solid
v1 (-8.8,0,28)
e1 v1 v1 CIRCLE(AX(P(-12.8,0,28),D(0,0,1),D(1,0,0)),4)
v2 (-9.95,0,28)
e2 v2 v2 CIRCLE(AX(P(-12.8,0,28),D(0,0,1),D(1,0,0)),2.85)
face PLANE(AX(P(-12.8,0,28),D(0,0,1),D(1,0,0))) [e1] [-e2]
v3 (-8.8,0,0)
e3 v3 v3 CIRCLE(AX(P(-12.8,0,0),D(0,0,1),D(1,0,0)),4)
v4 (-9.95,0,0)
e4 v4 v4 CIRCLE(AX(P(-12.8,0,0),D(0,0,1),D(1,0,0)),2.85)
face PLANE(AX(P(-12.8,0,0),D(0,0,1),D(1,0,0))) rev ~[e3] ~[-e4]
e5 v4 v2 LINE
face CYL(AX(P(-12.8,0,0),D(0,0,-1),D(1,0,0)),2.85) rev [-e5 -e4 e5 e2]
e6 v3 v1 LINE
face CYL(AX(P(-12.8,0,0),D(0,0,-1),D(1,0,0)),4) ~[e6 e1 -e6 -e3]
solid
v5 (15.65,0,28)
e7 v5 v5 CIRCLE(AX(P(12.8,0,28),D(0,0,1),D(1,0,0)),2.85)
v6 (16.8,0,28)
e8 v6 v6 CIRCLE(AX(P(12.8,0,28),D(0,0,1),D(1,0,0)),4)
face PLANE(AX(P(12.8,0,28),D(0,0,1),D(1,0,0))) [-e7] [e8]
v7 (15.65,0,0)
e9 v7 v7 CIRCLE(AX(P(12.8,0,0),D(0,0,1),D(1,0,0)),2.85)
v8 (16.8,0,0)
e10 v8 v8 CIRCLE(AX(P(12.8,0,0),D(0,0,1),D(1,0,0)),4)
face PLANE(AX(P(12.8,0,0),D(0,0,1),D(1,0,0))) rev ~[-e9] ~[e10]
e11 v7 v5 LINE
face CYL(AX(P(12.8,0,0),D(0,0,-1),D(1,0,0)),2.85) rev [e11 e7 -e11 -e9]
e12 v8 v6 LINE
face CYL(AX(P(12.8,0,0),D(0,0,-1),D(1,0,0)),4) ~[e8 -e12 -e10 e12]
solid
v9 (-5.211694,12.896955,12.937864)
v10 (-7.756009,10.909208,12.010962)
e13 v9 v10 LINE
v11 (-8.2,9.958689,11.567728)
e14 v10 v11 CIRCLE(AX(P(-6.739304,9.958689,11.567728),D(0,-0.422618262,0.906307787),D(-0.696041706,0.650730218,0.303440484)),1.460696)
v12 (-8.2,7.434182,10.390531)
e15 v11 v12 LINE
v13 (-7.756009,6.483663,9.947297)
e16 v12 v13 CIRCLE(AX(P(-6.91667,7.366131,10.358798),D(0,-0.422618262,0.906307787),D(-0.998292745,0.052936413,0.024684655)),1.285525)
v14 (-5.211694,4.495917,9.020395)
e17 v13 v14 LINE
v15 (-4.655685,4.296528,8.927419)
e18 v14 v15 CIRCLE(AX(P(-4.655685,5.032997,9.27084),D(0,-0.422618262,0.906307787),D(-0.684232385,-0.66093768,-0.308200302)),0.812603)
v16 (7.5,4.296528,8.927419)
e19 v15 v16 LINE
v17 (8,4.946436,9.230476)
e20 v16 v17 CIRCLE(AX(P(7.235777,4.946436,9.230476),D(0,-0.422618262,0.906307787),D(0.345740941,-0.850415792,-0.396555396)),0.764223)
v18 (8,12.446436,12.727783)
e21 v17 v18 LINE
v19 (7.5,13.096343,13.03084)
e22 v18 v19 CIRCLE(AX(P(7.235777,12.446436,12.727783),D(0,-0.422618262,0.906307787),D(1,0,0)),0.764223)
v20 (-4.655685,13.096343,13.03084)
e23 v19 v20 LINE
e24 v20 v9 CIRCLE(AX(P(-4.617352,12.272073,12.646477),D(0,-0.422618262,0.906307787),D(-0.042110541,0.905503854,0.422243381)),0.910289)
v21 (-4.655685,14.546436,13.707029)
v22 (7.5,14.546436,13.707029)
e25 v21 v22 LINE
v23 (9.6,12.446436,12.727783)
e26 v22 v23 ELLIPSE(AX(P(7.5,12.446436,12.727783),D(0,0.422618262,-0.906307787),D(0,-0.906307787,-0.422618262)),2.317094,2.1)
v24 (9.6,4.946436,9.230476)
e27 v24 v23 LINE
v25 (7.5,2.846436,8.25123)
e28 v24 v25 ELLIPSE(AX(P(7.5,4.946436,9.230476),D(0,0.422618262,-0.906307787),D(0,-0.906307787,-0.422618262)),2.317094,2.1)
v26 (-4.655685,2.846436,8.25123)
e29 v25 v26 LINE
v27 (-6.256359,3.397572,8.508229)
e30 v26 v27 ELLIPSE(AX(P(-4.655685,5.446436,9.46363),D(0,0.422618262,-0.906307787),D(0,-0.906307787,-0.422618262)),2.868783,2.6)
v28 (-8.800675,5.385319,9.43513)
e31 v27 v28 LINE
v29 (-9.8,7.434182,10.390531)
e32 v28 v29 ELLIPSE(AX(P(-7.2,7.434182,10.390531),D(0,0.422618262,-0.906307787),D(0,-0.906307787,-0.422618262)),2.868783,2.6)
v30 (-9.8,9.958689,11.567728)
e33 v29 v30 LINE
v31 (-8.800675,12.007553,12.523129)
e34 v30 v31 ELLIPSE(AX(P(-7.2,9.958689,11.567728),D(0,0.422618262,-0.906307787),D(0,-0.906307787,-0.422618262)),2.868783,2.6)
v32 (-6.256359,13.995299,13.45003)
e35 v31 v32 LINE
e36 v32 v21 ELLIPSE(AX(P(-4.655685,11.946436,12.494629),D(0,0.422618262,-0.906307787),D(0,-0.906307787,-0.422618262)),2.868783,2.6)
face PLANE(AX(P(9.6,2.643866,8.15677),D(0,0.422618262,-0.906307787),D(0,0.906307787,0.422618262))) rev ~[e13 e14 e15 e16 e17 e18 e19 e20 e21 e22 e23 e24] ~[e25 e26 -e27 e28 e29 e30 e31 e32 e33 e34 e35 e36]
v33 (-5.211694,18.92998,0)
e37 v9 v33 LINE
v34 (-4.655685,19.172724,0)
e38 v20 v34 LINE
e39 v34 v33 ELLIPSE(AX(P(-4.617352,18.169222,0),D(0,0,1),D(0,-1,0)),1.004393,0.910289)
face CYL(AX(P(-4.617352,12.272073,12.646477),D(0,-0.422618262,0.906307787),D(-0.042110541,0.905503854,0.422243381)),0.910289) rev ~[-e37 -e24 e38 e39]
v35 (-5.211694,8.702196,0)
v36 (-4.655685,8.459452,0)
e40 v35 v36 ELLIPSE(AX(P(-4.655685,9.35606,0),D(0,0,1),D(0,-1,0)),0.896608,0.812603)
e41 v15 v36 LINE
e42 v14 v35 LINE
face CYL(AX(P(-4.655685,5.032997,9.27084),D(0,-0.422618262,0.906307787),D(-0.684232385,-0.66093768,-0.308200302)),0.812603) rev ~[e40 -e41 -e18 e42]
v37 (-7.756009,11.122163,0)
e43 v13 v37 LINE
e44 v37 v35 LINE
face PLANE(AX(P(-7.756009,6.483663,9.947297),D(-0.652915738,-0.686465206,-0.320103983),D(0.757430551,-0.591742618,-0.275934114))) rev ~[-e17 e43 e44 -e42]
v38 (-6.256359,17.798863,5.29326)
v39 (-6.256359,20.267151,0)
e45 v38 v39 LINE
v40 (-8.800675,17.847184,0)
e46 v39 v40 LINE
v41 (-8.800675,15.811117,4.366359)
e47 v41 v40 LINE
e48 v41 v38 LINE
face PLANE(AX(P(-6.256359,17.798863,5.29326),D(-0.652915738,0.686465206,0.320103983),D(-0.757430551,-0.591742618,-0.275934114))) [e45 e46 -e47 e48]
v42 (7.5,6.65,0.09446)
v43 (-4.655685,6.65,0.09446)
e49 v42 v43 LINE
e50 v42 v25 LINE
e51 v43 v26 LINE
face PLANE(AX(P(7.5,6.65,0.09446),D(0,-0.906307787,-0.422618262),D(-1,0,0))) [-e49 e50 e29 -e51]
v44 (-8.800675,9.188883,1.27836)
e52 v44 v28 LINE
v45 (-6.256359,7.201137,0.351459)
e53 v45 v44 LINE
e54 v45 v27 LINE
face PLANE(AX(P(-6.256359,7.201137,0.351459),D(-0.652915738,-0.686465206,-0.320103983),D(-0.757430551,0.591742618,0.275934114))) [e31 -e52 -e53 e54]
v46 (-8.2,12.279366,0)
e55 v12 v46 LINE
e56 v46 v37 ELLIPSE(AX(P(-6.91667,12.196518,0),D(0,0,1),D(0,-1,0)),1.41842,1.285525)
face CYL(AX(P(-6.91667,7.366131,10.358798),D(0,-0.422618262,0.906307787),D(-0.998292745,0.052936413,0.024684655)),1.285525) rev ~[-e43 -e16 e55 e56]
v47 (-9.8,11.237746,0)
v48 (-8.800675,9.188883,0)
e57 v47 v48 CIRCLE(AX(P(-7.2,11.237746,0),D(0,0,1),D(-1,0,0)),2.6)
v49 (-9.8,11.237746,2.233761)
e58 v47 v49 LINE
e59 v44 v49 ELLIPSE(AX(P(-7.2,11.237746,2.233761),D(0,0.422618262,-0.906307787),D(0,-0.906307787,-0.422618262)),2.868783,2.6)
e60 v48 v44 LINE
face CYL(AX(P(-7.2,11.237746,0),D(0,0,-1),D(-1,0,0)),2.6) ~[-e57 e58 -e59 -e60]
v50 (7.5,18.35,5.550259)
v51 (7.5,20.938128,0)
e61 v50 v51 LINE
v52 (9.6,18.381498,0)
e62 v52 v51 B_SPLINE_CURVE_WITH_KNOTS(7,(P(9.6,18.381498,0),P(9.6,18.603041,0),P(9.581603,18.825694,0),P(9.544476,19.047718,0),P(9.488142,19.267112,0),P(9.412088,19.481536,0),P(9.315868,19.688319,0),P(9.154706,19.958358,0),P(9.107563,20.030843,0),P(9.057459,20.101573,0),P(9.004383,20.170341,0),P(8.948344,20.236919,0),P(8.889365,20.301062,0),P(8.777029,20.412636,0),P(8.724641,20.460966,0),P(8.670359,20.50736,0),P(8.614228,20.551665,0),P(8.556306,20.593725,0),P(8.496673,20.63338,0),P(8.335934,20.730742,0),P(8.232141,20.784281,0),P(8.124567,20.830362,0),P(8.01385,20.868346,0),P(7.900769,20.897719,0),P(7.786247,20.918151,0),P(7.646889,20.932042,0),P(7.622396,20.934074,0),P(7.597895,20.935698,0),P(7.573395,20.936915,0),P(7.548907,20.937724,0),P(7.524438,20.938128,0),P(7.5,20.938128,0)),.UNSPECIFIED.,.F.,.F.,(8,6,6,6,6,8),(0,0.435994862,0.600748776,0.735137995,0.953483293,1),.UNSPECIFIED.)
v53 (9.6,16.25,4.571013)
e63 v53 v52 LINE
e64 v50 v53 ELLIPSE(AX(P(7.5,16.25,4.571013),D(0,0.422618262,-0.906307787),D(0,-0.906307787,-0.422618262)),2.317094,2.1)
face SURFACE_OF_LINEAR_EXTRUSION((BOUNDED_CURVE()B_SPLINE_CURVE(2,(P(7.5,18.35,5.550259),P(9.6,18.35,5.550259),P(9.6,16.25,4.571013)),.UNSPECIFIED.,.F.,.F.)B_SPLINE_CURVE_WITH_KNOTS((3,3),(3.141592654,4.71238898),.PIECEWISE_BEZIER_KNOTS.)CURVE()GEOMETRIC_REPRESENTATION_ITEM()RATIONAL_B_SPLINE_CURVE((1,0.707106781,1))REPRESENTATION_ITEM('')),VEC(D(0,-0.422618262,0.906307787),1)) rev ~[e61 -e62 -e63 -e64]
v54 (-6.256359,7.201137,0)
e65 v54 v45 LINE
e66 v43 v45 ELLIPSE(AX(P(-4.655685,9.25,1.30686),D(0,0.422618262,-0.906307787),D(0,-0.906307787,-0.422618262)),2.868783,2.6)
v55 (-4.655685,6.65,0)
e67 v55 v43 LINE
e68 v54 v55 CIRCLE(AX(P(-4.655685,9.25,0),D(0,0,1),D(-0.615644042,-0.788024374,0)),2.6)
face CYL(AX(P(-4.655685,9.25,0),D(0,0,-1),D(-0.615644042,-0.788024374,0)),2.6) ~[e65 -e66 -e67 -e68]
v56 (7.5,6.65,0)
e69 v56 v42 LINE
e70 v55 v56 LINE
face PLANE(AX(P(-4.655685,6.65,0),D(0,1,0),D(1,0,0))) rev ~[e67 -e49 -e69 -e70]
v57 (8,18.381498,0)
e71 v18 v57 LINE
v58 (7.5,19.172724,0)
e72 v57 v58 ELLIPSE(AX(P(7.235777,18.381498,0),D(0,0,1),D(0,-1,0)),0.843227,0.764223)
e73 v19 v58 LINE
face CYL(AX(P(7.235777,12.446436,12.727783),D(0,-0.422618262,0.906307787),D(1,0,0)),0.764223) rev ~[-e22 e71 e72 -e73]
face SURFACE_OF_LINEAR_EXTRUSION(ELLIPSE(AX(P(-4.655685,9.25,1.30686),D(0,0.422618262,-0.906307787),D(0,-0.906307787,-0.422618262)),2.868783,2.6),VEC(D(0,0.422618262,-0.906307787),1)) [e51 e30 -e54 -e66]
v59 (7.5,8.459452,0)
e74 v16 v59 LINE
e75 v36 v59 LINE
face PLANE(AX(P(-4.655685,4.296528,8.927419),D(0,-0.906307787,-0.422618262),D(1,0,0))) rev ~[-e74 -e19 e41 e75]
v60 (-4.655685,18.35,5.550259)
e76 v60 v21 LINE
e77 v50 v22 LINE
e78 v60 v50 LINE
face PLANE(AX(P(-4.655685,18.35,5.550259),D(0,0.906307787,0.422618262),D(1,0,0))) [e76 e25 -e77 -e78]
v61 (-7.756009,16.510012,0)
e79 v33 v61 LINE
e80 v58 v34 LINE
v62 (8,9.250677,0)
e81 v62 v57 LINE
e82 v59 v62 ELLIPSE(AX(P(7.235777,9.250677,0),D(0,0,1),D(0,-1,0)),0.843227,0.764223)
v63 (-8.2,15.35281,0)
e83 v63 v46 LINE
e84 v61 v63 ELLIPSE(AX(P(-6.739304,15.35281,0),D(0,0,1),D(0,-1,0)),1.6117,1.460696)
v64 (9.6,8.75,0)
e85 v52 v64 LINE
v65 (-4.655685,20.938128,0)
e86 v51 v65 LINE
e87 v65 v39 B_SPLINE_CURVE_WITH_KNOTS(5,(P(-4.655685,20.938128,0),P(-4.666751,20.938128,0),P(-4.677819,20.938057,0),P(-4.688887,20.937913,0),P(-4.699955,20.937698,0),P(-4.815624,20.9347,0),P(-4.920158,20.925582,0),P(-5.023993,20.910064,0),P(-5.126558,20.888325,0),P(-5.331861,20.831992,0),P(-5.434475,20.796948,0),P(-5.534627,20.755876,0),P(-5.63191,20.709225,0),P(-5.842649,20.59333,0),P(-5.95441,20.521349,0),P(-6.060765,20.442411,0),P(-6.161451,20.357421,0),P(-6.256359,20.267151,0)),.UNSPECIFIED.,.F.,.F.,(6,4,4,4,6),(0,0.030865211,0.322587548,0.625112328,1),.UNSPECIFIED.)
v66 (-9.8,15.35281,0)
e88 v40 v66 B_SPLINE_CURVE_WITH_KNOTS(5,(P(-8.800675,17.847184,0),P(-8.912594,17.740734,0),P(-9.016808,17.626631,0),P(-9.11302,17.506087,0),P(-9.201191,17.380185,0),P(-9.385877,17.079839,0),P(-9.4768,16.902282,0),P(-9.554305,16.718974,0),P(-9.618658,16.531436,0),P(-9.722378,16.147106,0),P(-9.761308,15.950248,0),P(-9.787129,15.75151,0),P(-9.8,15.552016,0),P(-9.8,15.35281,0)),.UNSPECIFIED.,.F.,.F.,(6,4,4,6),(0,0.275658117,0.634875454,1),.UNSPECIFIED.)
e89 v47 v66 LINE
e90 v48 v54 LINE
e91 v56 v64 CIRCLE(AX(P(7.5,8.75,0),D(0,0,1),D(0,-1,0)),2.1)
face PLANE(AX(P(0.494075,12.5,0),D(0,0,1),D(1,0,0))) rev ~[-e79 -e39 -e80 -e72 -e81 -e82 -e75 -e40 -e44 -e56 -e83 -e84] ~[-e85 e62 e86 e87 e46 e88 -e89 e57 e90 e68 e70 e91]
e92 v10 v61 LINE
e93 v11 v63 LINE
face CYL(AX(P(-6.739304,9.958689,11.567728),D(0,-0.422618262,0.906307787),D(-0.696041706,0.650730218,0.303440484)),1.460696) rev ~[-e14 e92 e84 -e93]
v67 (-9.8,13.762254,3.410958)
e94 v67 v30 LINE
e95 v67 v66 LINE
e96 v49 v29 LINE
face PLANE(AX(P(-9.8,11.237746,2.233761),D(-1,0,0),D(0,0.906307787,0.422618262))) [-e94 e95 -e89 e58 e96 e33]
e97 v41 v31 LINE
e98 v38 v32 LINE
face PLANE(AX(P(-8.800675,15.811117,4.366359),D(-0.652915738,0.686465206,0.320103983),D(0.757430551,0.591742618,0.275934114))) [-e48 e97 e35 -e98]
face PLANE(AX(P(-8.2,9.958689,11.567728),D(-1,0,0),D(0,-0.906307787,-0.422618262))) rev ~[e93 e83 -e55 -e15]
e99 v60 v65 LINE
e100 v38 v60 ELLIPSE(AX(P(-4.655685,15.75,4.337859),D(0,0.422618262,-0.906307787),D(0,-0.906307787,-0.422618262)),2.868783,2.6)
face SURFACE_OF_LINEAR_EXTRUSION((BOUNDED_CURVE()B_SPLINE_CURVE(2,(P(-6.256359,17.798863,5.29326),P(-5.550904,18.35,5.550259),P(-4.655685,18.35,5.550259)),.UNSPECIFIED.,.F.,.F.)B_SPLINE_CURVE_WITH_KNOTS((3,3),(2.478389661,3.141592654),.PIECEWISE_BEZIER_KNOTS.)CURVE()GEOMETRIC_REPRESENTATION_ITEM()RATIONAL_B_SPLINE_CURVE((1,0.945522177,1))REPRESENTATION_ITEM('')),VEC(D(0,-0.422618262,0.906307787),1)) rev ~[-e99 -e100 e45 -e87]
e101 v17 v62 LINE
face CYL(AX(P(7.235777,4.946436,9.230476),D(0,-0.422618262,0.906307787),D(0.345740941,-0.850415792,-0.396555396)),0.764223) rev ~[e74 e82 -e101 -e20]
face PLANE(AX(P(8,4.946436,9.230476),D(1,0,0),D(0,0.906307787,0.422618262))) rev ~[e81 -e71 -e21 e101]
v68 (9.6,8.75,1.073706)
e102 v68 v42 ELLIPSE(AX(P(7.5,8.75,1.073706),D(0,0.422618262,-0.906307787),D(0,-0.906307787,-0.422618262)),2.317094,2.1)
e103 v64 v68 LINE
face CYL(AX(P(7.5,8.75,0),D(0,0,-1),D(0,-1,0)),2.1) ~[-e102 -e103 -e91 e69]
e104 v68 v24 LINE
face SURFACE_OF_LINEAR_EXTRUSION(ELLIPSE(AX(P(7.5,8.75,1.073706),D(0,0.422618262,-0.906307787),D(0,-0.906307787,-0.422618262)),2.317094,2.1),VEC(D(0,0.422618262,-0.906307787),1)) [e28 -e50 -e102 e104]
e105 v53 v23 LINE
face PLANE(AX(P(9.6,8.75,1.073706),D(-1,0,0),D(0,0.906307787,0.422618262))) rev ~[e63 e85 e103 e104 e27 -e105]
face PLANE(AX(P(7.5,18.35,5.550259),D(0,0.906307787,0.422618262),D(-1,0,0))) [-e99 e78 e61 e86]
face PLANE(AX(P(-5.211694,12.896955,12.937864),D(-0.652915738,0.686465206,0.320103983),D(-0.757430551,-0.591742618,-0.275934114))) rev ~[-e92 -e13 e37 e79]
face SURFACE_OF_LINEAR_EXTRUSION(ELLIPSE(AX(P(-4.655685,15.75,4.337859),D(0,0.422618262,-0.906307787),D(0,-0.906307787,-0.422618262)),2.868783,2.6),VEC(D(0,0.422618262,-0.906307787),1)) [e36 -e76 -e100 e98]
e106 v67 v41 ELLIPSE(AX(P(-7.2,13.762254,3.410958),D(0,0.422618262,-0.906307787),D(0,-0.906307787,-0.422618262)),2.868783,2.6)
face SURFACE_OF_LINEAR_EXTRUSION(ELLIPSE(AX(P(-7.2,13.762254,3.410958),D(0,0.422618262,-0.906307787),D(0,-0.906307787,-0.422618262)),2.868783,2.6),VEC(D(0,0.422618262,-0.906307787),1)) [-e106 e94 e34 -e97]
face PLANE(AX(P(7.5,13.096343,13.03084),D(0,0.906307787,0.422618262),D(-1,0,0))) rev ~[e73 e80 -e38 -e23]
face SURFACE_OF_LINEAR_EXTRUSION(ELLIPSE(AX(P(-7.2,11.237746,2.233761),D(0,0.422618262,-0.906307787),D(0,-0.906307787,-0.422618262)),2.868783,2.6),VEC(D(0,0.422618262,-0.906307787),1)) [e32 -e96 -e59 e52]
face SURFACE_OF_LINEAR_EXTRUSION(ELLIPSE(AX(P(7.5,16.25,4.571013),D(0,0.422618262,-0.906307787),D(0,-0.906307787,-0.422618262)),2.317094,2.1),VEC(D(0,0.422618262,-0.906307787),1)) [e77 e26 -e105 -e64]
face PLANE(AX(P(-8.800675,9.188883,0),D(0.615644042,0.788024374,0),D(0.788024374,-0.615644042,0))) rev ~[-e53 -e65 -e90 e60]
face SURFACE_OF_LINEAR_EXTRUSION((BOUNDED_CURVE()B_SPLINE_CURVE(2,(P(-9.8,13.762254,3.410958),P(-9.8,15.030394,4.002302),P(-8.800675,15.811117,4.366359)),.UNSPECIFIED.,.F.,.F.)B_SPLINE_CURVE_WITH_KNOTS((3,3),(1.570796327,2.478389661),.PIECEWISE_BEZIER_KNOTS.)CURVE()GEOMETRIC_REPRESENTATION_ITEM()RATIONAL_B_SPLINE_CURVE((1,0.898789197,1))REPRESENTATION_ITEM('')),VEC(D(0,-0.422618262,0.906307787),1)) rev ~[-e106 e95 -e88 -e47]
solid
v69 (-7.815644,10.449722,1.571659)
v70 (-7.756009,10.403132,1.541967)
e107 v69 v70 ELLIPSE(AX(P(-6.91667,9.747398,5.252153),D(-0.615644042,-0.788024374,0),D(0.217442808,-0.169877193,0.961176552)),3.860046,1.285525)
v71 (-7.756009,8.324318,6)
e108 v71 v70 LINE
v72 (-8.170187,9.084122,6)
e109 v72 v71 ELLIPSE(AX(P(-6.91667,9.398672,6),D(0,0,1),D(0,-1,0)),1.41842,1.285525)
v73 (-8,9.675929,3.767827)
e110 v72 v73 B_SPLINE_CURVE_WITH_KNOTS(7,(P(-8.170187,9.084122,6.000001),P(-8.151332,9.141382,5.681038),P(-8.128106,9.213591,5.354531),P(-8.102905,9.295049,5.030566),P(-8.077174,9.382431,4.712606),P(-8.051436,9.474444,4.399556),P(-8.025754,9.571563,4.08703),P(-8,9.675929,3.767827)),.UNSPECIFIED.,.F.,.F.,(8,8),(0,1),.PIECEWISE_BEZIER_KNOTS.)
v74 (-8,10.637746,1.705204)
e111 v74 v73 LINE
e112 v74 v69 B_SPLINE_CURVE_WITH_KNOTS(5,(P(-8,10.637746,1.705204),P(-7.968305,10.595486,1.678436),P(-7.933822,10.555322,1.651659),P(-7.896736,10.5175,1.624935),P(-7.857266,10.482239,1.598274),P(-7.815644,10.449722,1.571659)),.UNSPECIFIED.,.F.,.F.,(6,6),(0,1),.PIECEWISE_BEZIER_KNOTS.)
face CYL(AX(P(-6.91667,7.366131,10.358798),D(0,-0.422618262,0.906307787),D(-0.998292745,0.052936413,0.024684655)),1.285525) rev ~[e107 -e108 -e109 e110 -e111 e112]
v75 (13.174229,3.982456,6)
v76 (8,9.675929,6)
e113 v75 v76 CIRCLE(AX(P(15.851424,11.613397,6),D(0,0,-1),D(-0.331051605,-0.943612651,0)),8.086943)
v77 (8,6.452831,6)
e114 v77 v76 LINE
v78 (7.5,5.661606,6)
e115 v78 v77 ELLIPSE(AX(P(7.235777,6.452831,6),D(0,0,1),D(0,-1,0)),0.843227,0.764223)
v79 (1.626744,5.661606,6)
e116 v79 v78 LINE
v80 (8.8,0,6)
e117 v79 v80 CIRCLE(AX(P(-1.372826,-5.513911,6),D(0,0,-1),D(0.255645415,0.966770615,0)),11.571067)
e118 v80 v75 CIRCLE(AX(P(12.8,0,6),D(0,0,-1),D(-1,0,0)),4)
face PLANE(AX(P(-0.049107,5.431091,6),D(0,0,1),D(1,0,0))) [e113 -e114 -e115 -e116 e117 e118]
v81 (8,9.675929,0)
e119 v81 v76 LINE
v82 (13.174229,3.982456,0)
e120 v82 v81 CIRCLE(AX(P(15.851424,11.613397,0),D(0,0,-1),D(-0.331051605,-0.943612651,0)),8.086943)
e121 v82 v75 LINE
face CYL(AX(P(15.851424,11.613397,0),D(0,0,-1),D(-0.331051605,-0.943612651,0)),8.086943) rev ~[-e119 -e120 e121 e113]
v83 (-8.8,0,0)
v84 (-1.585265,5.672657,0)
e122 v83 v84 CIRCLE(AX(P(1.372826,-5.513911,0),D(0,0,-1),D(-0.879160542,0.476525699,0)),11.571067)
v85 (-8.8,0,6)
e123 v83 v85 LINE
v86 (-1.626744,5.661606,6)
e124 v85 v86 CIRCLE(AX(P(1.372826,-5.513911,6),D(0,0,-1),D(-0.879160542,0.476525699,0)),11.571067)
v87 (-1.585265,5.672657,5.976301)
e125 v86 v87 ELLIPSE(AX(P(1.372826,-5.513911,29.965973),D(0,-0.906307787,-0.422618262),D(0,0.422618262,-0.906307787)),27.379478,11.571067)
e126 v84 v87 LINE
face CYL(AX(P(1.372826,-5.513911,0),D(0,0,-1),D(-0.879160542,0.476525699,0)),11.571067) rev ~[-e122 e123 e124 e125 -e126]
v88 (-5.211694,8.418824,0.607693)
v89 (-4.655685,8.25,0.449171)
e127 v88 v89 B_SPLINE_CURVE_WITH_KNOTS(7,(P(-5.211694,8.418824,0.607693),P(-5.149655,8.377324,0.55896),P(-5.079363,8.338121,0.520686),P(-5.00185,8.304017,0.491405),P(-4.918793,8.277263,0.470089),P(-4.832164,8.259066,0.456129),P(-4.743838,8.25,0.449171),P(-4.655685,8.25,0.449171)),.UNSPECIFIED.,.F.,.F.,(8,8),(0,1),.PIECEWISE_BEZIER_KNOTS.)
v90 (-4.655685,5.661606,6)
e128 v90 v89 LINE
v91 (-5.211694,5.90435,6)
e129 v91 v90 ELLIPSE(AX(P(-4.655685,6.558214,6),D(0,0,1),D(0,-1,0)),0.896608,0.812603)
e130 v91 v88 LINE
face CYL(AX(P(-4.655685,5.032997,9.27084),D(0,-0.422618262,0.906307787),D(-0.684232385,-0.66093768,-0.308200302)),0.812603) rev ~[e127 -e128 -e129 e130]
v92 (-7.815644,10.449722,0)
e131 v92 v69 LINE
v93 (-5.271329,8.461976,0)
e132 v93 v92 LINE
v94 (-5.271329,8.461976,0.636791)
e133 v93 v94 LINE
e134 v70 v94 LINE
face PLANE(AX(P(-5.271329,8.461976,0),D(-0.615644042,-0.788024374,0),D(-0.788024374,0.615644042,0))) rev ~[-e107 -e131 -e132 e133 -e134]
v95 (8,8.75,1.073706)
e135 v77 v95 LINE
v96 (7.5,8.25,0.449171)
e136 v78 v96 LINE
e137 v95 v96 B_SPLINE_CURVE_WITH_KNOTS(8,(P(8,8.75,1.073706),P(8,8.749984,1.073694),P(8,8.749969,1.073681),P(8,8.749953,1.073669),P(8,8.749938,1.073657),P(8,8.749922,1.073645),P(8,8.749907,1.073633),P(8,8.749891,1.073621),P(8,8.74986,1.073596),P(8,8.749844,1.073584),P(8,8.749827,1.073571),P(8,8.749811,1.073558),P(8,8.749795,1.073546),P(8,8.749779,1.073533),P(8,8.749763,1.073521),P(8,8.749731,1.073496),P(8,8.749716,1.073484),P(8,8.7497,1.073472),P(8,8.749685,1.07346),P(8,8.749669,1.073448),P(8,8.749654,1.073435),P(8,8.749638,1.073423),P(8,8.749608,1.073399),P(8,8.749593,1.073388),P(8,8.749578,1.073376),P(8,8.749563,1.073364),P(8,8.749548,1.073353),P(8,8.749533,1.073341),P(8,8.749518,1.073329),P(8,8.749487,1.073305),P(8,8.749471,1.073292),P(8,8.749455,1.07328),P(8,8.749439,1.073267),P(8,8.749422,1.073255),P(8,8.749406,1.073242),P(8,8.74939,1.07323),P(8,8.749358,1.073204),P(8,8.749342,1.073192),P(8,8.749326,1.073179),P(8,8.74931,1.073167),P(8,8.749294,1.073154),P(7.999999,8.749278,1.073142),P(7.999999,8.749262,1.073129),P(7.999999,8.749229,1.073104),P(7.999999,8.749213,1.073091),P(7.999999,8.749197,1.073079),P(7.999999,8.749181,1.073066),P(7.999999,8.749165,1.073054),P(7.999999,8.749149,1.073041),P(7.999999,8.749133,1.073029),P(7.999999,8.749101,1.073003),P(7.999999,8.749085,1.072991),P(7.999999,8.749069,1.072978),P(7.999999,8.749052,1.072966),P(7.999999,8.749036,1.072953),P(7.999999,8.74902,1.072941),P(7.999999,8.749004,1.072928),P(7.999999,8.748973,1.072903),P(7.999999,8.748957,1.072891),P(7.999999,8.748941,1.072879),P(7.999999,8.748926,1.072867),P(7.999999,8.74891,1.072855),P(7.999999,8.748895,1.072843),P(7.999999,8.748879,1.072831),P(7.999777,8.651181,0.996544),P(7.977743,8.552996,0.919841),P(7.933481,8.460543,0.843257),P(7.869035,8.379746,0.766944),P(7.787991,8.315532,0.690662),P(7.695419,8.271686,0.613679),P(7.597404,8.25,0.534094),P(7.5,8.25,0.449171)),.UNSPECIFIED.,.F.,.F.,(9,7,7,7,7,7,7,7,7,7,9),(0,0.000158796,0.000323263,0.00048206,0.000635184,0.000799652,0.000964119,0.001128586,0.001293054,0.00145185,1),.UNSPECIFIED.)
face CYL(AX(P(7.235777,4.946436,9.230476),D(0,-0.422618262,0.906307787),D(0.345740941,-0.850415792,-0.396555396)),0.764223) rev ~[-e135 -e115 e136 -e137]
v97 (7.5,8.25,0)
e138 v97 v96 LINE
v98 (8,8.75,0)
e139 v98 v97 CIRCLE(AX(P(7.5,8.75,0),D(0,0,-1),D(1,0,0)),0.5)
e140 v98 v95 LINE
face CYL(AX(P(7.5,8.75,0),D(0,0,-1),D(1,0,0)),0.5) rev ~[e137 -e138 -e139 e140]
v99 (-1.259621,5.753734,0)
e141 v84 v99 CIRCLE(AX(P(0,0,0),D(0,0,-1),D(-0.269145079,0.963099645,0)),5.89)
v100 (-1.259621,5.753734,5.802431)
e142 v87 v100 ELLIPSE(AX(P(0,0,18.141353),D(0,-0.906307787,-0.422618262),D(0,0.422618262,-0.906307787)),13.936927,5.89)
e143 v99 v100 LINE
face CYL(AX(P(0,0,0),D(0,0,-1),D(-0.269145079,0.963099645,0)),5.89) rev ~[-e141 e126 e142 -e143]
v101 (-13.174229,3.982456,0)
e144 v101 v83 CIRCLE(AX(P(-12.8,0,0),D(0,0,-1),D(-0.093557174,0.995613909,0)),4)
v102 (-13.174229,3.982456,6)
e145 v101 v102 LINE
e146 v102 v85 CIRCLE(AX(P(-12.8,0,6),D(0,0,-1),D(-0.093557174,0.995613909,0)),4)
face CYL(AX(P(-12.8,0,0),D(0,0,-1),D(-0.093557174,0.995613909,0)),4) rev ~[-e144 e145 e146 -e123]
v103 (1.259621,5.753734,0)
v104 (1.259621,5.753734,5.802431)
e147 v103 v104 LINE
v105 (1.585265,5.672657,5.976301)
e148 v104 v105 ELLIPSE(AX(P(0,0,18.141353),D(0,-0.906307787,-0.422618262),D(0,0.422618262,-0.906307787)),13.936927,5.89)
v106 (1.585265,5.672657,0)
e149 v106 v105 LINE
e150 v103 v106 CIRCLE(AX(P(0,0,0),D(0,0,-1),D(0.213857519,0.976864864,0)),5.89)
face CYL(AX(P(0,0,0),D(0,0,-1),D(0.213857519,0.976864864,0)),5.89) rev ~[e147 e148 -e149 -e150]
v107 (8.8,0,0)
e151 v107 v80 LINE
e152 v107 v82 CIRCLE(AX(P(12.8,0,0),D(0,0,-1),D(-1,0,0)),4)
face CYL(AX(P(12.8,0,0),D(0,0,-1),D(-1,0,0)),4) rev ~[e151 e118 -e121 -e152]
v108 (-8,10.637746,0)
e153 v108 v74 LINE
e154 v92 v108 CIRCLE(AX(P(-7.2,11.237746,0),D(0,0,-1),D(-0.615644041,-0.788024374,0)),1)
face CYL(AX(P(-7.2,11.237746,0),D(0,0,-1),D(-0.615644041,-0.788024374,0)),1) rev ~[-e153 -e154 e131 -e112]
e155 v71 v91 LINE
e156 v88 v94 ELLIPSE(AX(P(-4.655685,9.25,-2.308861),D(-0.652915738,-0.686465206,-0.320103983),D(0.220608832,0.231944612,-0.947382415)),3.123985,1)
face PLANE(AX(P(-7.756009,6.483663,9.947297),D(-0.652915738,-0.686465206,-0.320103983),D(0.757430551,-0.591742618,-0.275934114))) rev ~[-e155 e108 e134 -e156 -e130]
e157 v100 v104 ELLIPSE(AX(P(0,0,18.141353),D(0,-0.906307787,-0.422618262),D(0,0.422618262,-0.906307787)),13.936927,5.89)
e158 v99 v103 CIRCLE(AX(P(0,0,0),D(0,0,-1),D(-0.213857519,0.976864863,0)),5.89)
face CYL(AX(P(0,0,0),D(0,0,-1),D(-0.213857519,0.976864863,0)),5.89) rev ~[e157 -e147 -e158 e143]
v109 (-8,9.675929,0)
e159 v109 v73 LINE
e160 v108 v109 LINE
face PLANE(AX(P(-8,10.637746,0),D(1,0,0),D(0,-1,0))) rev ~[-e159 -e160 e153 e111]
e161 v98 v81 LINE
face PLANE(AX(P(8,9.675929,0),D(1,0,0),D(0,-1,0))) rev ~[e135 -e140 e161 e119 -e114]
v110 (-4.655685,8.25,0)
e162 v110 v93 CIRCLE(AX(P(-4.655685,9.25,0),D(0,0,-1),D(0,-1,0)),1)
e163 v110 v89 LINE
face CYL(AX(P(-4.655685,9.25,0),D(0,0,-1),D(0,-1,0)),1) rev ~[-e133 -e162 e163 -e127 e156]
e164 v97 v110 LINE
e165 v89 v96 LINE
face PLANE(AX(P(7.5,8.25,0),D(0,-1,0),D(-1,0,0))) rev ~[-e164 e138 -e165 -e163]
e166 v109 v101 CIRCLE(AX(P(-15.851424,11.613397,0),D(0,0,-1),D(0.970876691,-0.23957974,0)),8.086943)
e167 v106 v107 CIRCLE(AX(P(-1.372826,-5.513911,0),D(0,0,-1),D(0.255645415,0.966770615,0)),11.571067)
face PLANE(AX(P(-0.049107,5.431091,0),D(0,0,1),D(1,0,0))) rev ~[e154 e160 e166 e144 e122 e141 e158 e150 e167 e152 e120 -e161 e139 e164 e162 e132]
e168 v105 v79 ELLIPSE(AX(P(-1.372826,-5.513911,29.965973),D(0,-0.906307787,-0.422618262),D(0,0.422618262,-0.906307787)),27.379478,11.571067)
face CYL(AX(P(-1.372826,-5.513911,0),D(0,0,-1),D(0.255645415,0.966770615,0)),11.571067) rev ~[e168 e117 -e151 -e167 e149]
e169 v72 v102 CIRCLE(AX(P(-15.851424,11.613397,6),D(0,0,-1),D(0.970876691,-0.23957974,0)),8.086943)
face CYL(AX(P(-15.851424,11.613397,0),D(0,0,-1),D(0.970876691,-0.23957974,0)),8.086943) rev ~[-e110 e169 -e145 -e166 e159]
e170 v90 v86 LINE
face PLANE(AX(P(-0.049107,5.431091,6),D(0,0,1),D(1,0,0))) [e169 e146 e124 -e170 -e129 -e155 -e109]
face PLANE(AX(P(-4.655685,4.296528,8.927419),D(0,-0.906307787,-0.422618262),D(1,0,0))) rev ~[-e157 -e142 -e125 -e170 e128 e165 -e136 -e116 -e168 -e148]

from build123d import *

# Parameters (mm, degrees)
F0_R      = 4
F0_R_2    = 2.85
F2_DEPTH  = 28
F4_DEPTH  = 6
F7_DEPTH  = 50
F8_REACH  = 28.3339417877
F9_DEPTH  = 9
F10_DEPTH = 6
F12_DEPTH = 50


# Not quite as in the source:
# - a feature names something its author has since deleted; it is built from what else it names


with BuildPart() as f2:
    # F0 (on Top) → F2 (new body)
    with BuildSketch(Plane.XY):
        with Locations((-12.8, 0)):
            Circle(F0_R)
        with Locations((-12.8, 0)):
            Circle(F0_R_2, mode=Mode.SUBTRACT)
    extrude(amount=F2_DEPTH)


with BuildPart() as f2b:
    # F0 (on Top) → F2, piece 2 (new body)
    with BuildSketch(Plane.XY):
        with Locations((12.8, 0)):
            Circle(F0_R)
        with Locations((12.8, 0)):
            Circle(F0_R_2, mode=Mode.SUBTRACT)
    extrude(amount=F2_DEPTH)


with BuildPart() as f4:
    # F3 (on Top) → F4 (new body)
    with BuildSketch(Plane.XY):
        with BuildLine():
            Line((7.5, 18.35), (-4.6556847597, 18.35))
            ThreePointArc((-4.6556847597, 18.35), (-5.5021347681, 18.2083576597), (-6.2563592688, 17.7988633717))
            Line((-6.2563592688, 17.7988633717), (-8.8006745091, 15.8111170902))
            ThreePointArc((-8.8006745091, 15.8111170902), (-9.5368519127, 14.9020445494), (-9.8, 13.7622537185))
            Line((-9.8, 13.7622537185), (-9.8, 12.5))
            Line((-9.8, 12.5), (-9.8, 11.2377462815))
            ThreePointArc((-9.8, 11.2377462815), (-9.5368519127, 10.0979554506), (-8.8006745091, 9.1888829098))
            Line((-8.8006745091, 9.1888829098), (-6.2563592688, 7.2011366283))
            ThreePointArc((-6.2563592688, 7.2011366283), (-5.5021347681, 6.7916423403), (-4.6556847597, 6.65))
            Line((-4.6556847597, 6.65), (7.5, 6.65))
            ThreePointArc((7.5, 6.65), (8.9849242405, 7.2650757595), (9.6, 8.75))
            Line((9.6, 8.75), (9.6, 12.5))
            Line((9.6, 12.5), (9.6, 16.25))
            ThreePointArc((9.6, 16.25), (8.9849242405, 17.7349242405), (7.5, 18.35))
        make_face()
    extrude(amount=F4_DEPTH)

    # F6 (on offset) → F7 (cut)
    with BuildSketch(Plane.YZ.offset(9.6)):
        Polygon((6.4474307001, 6.8065319635), (6.4474307001, 0), (21.0440856005, 6.8065319635), align=None)
    extrude(amount=-F7_DEPTH, mode=Mode.SUBTRACT)

    f8_end = Plane(origin=(0.3975429919, 12.5, 0), x_dir=(-1, 0, 0), z_dir=(0, 0, -1))
    # F7_face (on face) → F8 (join, up to a plane its end follows)
    with BuildSketch(Plane(origin=(0.3975429919, 12.5, 2.8223594161), x_dir=(1, 0, 0), z_dir=(0, -0.4226182617, 0.906307787))):
        with BuildLine():
            Line((9.2024570081, -4.1376671961), (9.2024570081, 4.1376671961))
            add(Edge.make_bspline(
                [(7.1024570081, 6.4547608259), (9.2024570081, 6.4547608259), (9.2024570081, 4.1376671961)],
                knots=[3.1415926536, 3.1415926536, 3.1415926536, 4.7123889804, 4.7123889804, 4.7123889804], degree=2, weights=[1, 0.7071067812, 1]))
            Line((7.1024570081, 6.4547608259), (-5.0532277516, 6.4547608259))
            add(Edge.make_bspline(
                [(-6.6539022607, 5.8466488399), (-5.9484473765, 6.4547608259), (-5.0532277516, 6.4547608259)],
                knots=[2.4783896609, 2.4783896609, 2.4783896609, 3.1415926536, 3.1415926536, 3.1415926536], degree=2, weights=[1, 0.9455221768, 1]))
            Line((-6.6539022607, 5.8466488399), (-9.198217501, 3.6534134844))
            add(Edge.make_bspline(
                [(-10.1975429919, 1.3927428811), (-10.1975429919, 2.7919809215), (-9.198217501, 3.6534134844)],
                knots=[1.5707963268, 1.5707963268, 1.5707963268, 2.4783896609, 2.4783896609, 2.4783896609], degree=2, weights=[1, 0.8987891972, 1]))
            Line((-10.1975429919, 1.3927428811), (-10.1975429919, -1.3927428811))
            add(Edge.make_bspline(
                [(-9.198217501, -3.6534134844), (-10.1975429919, -2.7919809215), (-10.1975429919, -1.3927428811)],
                knots=[0.6632029927, 0.6632029927, 0.6632029927, 1.5707963268, 1.5707963268, 1.5707963268], degree=2, weights=[1, 0.8987891972, 1]))
            Line((-9.198217501, -3.6534134844), (-6.6539022607, -5.8466488399))
            add(Edge.make_bspline(
                [(-5.0532277516, -6.4547608259), (-5.9484473765, -6.4547608259), (-6.6539022607, -5.8466488399)],
                knots=[0, 0, 0, 0.6632029927, 0.6632029927, 0.6632029927], degree=2, weights=[1, 0.9455221768, 1]))
            Line((-5.0532277516, -6.4547608259), (7.1024570081, -6.4547608259))
            add(Edge.make_bspline(
                [(9.2024570081, -4.1376671961), (9.2024570081, -6.4547608259), (7.1024570081, -6.4547608259)],
                knots=[4.7123889804, 4.7123889804, 4.7123889804, 6.2831853072, 6.2831853072, 6.2831853072], degree=2, weights=[1, 0.7071067812, 1]))
        make_face()
    f8_long = extrude(amount=-F8_REACH, mode=Mode.PRIVATE)
    add(split(f8_long, bisect_by=f8_end, keep=Keep.BOTTOM, mode=Mode.PRIVATE))

    # F9 (add): a face of the model
    f9_faces = [f4.faces().sort_by_distance(p)[0] for p in [
        (0.3975429919, 12.5, 2.8223594161),
    ]]
    extrude(f9_faces, amount=F9_DEPTH)


with BuildPart() as f10:
    # F1 (on Top) → F10 (new body)
    with BuildSketch(Plane.XY):
        with BuildLine():
            ThreePointArc((-1.2596207883, 5.7537340458), (0, 5.89), (1.2596207883, 5.7537340458))
            ThreePointArc((1.2596207883, 5.7537340458), (1.4230201919, 5.7155151591), (1.5852645107, 5.6726569111))
            ThreePointArc((1.5852645107, 5.6726569111), (5.7790969207, 3.5822201075), (8.8, 0))
            ThreePointArc((8.8, 0), (10.1071311565, 2.9577791317), (13.174228696, 3.9824556348))
            ThreePointArc((13.174228696, 3.9824556348), (9.8667045598, 6.1744840875), (8, 9.6759293228))
            Line((8, 9.6759293228), (8, 8.75))
            ThreePointArc((8, 8.75), (7.8535533906, 8.3964466094), (7.5, 8.25))
            Line((7.5, 8.25), (-4.6556847597, 8.25))
            ThreePointArc((-4.6556847597, 8.25), (-4.9812424552, 8.3044778232), (-5.2713288016, 8.4619756263))
            Line((-5.2713288016, 8.4619756263), (-7.815644042, 10.4497219078))
            ThreePointArc((-7.815644042, 10.4497219078), (-7.9140380275, 10.5376393644), (-8, 10.6377462815))
            Line((-8, 10.6377462815), (-8, 9.6759293228))
            ThreePointArc((-8, 9.6759293228), (-9.8667045598, 6.1744840875), (-13.174228696, 3.9824556348))
            ThreePointArc((-13.174228696, 3.9824556348), (-10.1071311565, 2.9577791317), (-8.8, 0))
            ThreePointArc((-8.8, 0), (-5.7790969207, 3.5822201075), (-1.5852645107, 5.6726569111))
            ThreePointArc((-1.5852645107, 5.6726569111), (-1.4230201919, 5.7155151591), (-1.2596207883, 5.7537340458))
        make_face()
    extrude(amount=F10_DEPTH)


with BuildPart() as f12_tool:
    # F11 (on face) → F12 (new body)
    with BuildSketch(Plane(origin=(0, -2.6520132898, 5.6872608532), x_dir=(1, 0, 0), z_dir=(0, -0.4226182617, 0.906307787))):
        with BuildLine():
            ThreePointArc((8, 16.6592951645), (7.8626590068, 17.0963944879), (7.5, 17.3763887943))
            Line((7.5, 17.3763887943), (-4.6556847597, 17.3763887943))
            ThreePointArc((-4.6556847597, 17.3763887943), (-4.9522690953, 17.3133448608), (-5.2116940879, 17.1563879273))
            Line((-5.2116940879, 17.1563879273), (-7.7560093283, 14.9631525718))
            ThreePointArc((-7.7560093283, 14.9631525718), (-8.0844304273, 14.4838159341), (-8.2, 13.9143708495))
            Line((-8.2, 13.9143708495), (-8.2, 11.1288850873))
            ThreePointArc((-8.2, 11.1288850873), (-8.1004846181, 10.5526436305), (-7.7560093283, 10.080103365))
            Line((-7.7560093283, 10.080103365), (-5.2116940879, 7.8868680095))
            ThreePointArc((-5.2116940879, 7.8868680095), (-4.9546608267, 7.7238664411), (-4.6556847597, 7.6668671425))
            Line((-4.6556847597, 7.6668671425), (7.5, 7.6668671425))
            ThreePointArc((7.5, 7.6668671425), (7.8626590068, 7.9468614489), (8, 8.3839607723))
            Line((8, 8.3839607723), (8, 16.6592951645))
        make_face()
    extrude(amount=-F12_DEPTH)


with BuildPart() as f4_1:
    add(f4.part)

    # F12: cut by f12_tool
    add(f12_tool.part, mode=Mode.SUBTRACT)


with BuildPart() as f10_1:
    add(f10.part)

    # F12: cut by f12_tool
    add(f12_tool.part, mode=Mode.SUBTRACT)


solid = Compound([f2.part, f2b.part, f4_1.part, f10_1.part])
